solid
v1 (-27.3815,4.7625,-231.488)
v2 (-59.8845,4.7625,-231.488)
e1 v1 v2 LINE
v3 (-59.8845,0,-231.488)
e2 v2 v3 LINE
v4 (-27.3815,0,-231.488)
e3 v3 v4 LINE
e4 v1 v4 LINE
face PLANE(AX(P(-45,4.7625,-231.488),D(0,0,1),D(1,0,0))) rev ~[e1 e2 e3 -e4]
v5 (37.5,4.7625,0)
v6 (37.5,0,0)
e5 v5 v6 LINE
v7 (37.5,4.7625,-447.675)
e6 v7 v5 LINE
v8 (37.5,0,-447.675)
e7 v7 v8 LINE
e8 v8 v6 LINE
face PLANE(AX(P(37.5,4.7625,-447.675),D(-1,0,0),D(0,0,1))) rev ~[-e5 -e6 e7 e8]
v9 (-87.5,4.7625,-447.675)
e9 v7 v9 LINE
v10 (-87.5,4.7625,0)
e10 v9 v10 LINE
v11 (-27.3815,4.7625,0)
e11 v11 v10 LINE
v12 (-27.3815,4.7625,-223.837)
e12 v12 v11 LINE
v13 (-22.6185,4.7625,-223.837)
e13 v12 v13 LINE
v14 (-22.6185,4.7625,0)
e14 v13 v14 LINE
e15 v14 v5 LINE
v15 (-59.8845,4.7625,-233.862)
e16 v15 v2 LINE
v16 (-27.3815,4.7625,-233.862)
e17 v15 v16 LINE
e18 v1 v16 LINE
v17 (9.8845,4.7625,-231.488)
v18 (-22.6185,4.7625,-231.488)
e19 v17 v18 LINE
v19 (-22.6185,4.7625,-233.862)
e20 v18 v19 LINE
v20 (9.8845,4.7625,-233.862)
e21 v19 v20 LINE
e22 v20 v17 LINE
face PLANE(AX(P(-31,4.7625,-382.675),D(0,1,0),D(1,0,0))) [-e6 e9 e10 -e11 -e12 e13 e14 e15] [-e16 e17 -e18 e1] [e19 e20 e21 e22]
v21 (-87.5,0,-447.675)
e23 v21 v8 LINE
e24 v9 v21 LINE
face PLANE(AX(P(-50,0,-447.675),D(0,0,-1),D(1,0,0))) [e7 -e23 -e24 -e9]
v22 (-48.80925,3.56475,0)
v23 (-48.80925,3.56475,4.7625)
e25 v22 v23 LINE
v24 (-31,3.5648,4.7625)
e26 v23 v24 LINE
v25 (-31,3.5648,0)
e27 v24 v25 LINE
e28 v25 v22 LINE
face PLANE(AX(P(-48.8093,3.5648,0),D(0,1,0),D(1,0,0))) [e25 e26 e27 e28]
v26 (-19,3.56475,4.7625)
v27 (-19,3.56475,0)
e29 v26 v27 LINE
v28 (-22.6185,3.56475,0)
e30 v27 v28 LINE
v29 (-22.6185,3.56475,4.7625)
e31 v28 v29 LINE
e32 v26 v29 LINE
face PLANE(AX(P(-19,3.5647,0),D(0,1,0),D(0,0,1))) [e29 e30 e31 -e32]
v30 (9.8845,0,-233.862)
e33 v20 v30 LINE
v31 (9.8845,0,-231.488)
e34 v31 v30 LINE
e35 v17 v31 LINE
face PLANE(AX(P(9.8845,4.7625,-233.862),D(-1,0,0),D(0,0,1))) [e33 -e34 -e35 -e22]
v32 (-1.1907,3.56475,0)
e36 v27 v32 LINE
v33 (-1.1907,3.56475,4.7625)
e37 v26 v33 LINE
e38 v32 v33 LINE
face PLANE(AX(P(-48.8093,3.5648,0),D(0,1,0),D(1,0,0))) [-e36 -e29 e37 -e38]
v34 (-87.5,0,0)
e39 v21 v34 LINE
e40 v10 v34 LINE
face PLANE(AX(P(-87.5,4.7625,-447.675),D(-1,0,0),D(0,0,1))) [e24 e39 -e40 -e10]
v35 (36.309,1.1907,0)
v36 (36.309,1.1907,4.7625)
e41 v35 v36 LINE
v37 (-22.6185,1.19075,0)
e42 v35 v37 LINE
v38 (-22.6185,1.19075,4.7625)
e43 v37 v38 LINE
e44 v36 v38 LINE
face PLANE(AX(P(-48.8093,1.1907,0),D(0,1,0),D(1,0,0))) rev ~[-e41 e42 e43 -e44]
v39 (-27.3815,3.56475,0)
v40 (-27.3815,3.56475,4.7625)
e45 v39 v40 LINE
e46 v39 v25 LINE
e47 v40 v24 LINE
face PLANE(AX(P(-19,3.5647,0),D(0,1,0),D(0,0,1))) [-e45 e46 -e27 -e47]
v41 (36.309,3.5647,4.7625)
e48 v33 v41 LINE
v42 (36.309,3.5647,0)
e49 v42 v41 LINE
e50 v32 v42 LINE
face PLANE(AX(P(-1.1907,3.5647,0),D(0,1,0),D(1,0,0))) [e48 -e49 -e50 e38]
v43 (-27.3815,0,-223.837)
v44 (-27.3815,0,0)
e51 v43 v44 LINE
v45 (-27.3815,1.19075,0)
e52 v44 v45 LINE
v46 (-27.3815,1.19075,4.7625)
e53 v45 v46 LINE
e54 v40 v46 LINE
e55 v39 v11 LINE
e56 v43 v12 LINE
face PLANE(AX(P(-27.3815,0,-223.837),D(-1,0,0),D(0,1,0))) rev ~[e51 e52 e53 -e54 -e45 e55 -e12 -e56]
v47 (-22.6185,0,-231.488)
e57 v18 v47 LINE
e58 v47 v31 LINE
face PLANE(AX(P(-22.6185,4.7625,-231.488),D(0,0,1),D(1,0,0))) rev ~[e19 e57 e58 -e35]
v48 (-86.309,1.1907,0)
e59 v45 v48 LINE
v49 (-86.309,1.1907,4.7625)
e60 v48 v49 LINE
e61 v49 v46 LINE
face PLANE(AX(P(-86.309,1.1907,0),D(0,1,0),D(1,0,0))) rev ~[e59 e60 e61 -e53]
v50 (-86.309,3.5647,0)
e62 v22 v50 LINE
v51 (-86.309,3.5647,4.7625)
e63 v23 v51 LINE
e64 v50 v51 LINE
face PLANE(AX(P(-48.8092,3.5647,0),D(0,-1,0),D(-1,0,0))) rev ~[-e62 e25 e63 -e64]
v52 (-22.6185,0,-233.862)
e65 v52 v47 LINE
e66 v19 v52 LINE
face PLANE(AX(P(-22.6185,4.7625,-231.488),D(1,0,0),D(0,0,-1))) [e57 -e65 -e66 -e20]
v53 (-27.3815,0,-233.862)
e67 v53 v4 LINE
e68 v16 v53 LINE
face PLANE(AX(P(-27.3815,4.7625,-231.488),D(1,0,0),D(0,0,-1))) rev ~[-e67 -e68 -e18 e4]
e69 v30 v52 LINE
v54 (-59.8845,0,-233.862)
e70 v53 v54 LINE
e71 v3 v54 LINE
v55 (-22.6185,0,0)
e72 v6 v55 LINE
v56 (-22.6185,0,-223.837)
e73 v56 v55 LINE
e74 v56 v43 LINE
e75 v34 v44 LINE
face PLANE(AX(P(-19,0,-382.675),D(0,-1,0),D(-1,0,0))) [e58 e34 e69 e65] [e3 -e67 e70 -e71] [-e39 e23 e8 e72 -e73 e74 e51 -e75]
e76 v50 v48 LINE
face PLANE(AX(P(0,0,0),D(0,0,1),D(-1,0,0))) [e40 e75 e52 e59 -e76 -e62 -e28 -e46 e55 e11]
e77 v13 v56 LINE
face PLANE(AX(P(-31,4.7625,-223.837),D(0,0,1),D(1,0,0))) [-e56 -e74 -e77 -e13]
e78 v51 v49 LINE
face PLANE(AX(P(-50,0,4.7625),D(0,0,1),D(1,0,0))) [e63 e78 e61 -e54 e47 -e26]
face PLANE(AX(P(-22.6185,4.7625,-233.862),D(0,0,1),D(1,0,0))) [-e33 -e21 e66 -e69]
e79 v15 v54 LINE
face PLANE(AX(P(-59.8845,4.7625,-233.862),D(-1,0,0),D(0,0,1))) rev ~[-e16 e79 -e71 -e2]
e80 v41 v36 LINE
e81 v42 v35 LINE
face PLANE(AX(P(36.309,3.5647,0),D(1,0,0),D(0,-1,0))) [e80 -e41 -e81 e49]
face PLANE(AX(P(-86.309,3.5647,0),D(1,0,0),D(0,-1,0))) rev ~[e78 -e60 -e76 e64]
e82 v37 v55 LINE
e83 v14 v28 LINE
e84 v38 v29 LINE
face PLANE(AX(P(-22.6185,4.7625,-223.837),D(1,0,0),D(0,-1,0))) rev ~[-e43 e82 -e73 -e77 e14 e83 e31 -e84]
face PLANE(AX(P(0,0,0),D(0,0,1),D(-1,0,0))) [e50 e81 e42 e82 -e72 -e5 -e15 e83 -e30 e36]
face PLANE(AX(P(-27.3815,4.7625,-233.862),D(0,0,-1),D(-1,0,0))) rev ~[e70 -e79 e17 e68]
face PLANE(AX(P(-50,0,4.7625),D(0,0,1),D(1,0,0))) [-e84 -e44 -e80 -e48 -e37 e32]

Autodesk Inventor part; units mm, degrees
ref_plane "YZ Plane" through (0, 0, 0) normal (1, 0, 0) x (0, 1, 0)
ref_plane "XZ Plane" through (0, 0, 0) normal (0, 1, 0) x (-1, 0, 0)
ref_plane "XY Plane" through (0, 0, 0) normal (0, 0, 1) x (1, 0, 0)
sketch "Sketch1" plane through (0, 0, 0) normal (0, 1, 0) x (-1, 0, 0)
  line L0 (0, 0) -> (50, 0)
  line L1 (50, 0) -> (50, -447.675)
  line L2 (50, -447.675) -> (0, -447.675)
  line L3 (0, -447.675) -> (0, 0)
  dimension "d0" = 50
  dimension "d1" = 447.675
extrude "Extrusion1" add sketch "Sketch1" along normal blind 4.7625
sketch "Sketch2" plane through (-50, 0, 0) normal (0, 0, 1) x (1, 0, 0)
  line L0 (1.1907, 3.5648) -> (1.1907, 1.1907)
  line L1 (50, 0) -> (0, 0) projected
  line L2 (50, 4.7625) -> (0, 4.7625) projected
  line L3 (1.1907, 1.1907) -> (48.8093, 1.1907)
  line L4 (1.1907, 3.5648) -> (48.8093, 3.5648)
  line L5 (48.8093, 3.5648) -> (48.8093, 1.1907)
  line L6 (50, 0) -> (50, 4.7625) projected
extrude "Extrusion2" add sketch "Sketch2" along normal blind 4.7625
sketch "Sketch3" plane through (0, 4.7625, 0) normal (0, 1, 0) x (1, 0, 0)
  line L0 (-50, 447.675) -> (-50, 0) projected
  line L1 (-50, 447.675) -> (-25, 447.675)
  line L2 (0, 447.675) -> (-50, 447.675) projected
  line L3 (-25, 447.675) -> (-25, 382.675)
  line L4 (-31, 382.675) -> (-19, 382.675)
  line L5 (-31, 382.675) -> (-31, 0)
  line L6 (-1.1907, 0) -> (-48.8093, 0) projected
  line L7 (-19, 382.675) -> (-19, 0)
  line L8 (-31, 0) -> (-19, 0)
  point P0 (0, 0)
  dimension "d11" = 25
extrude "Extrusion3" cut sketch "Sketch3" against normal blind 10
sketch "Sketch4" plane through (-50, 0, 4.7625) normal (0, 0, 1) x (1, 0, 0)
  line L0 (31, 3.5648) -> (31, 1.1907) projected
  line L1 (31, 1.1907) -> (31, 3.5648)
  line L2 (19, 3.5648) -> (31, 3.5648) projected
  line L3 (31, 3.5648) -> (19, 3.5648)
  line L4 (19, 3.5648) -> (19, 1.1907)
  line L5 (19, 1.1907) -> (31, 1.1907)
  point P0 (50, 0)
extrude "Extrusion4" cut sketch "Sketch4" against normal blind 10
sketch "Sketch5" plane through (0, 4.7625, 0) normal (0, 1, 0) x (1, 0, 0)
  point P0 (0, 0)
sketch "Sketch6" plane through (-31, 4.7625, -382.675) normal (0, 0, 1) x (1, 0, 0)
  line L0 (12, -4.7625) -> (0, -4.7625) projected
  line L1 (12, 0) -> (12, -4.7625) projected
  line L2 (0, 0) -> (12, 0) projected
  line L3 (0, 0) -> (0, -4.7625) projected
  point P0 (31, -4.7625)
extrude "Extrusion5" add sketch "Sketch6" along normal blind 158.838
sketch "Sketch8" plane through (-31, 4.7625, -223.837) normal (0, 0, 1) x (1, 0, 0)
  line L0 (3.6185, -4.7625) -> (3.6185, 0)
  line L1 (3.6185, 0) -> (8.3815, 0)
  line L2 (8.3815, 0) -> (8.3815, -4.7625)
  line L3 (3.6185, -4.7625) -> (8.3815, -4.7625)
  line L4 (0, -4.7625) -> (12, -4.7625) projected
  line L5 (-19, 0) -> (0, 0) projected
  line L6 (0, 0) -> (3.6185, 0)
  line L7 (12, 0) -> (0, 0) projected
  line L8 (3.6185, -4.7625) -> (0, -4.7625)
  line L9 (0, -4.7625) -> (0, 0) projected
  line L10 (0, -4.7625) -> (0, 0)
  line L11 (8.3815, 0) -> (12, 0)
  line L12 (12, -3.5718) -> (12, -4.7625) projected
  line L13 (12, -4.7625) -> (8.3815, -4.7625)
  line L14 (12, -4.7625) -> (12, 0)
  point P0 (31, -4.7625)
  dimension "d25" = 4.763
extrude "Extrusion6" add sketch "Sketch8" along normal blind 223.837 contours L4 L9 L6 L0 | L2 L7 L14 L12 L4
sketch "Sketch9" plane through (-19, 1.1907, 0) normal (-1, 0, 0) x (0, 0, 1)
  line L0 (0, 2.374) -> (0, 0) projected
  line L1 (4.7625, 0) -> (0, 0) projected
  line L2 (4.7625, 2.374) -> (4.7625, 0) projected
  line L3 (0, 2.374) -> (4.7625, 2.374) projected
  point P0 (0, -1.1907)
extrude "Extrusion7" add sketch "Sketch9" along normal blind 15
sketch "Sketch10" plane through (-22.6185, 3.5648, 0) normal (0, 0, -1) x (-1, 0, 0)
  line L0 (4.763, -2.374) -> (4.763, 0) projected
  line L1 (0, 0) -> (4.763, 0) projected
  line L2 (0, 0) -> (0, -2.374) projected
  line L3 (0, -2.374) -> (4.763, -2.374) projected
  point P0 (-22.6185, -3.5648)
extrude "Extrusion8" cut sketch "Sketch10" against normal blind 15
sketch "Sketch14" plane through (0, 4.7625, 0) normal (0, 1, 0) x (1, 0, 0)
  line L0 (0, 447.675) -> (-50, 447.675) projected
  line L1 (0, 0) -> (0, 447.675) projected
  line L2 (-50, 447.675) -> (-50, 0) projected
  line L3 (-27.3815, 223.837) -> (-27.3815, 0) projected
  line L4 (-22.6185, 223.837) -> (-22.6185, 0) projected
  line L5 (-5, 231.488) -> (-22.6185, 231.488)
  line L6 (-22.6185, 231.488) -> (-22.6185, 233.862)
  line L7 (-22.6185, 233.862) -> (-5, 233.862)
  line L8 (-5, 231.488) -> (-5, 233.862)
  line L9 (-27.3815, 223.837) -> (-22.6185, 223.837) projected
  line L10 (-45, 231.488) -> (-27.3815, 231.488)
  line L11 (-27.3815, 231.488) -> (-27.3815, 233.862)
  line L12 (-27.3815, 233.862) -> (-45, 233.862)
  line L13 (-45, 231.488) -> (-45, 233.862)
  dimension "d35" = 2.374
extrude "Extrusion9" cut sketch "Sketch14" against normal blind 10
sketch "Sketch17" plane through (0, 4.7625, 0) normal (0, 1, 0) x (1, 0, 0)
  line L0 (0, 0) -> (37.5, 0)
  line L1 (0, 447.675) -> (-50, 447.675) projected
  line L2 (0, 447.675) -> (37.5, 447.675)
  line L3 (37.5, 447.675) -> (37.5, 0)
  line L4 (0, 0) -> (0, 447.675) projected
  line L5 (0, 0) -> (0, 447.675)
  line L6 (-50, 0) -> (-87.5, 0)
  line L7 (-50, 447.675) -> (-87.5, 447.675)
  line L8 (-87.5, 447.675) -> (-87.5, 0)
  line L9 (-50, 0) -> (-50, 447.675)
  dimension "d39" = 37.5
  dimension "d40" = 37.5
extrude "Extrusion10" add sketch "Sketch17" against normal up to surface (4.7625 mm away)
sketch "Sketch18" plane through (-1.1907, 1.1907, 0) normal (0, 0, 1) x (1, 0, 0)
  line L0 (37.4997, 0) -> (0, 0)
  line L1 (0, 2.374) -> (0, 0) projected
  line L2 (0, 0) -> (0, 2.374)
  line L3 (0, 2.374) -> (37.4997, 2.374)
  line L4 (37.4997, 2.374) -> (37.4997, 0)
  line L5 (38.6907, -1.1907) -> (-86.3093, -1.1907) projected
  line L6 (-21.4278, 3.5718) -> (-26.1908, 3.5718) projected
  line L7 (-85.1183, 0) -> (-47.6185, 0)
  line L8 (-47.6185, 2.374) -> (-47.6185, 0)
  line L9 (-47.6185, 2.374) -> (-85.1183, 2.374)
  line L10 (-85.1183, 2.374) -> (-85.1183, 0)
extrude "Extrusion11" add sketch "Sketch18" along normal up to surface (4.7625 mm away)
sketch "Sketch19" plane through (0, 4.7625, 0) normal (0, 1, 0) x (1, 0, 0)
  line L0 (-22.6185, 231.488) -> (9.8845, 231.488)
  line L1 (-22.6185, 233.862) -> (9.8845, 233.862)
  line L2 (9.8845, 233.862) -> (9.8845, 231.488)
  line L3 (-22.6185, 231.488) -> (-22.6185, 233.862)
  line L4 (-27.3815, 223.837) -> (-22.6185, 223.837) projected
  line L5 (-27.3815, 231.488) -> (-59.8845, 231.488)
  line L6 (-27.3815, 233.862) -> (-59.8845, 233.862)
  line L7 (-59.8845, 233.862) -> (-59.8845, 231.488)
  line L8 (-27.3815, 231.488) -> (-27.3815, 233.862)
  point P0 (0, 0)
  dimension "d47" = 32.503
extrude "Extrusion12" cut sketch "Sketch19" against normal blind 10
properties part number "Sustainable Chair_V1 - Leg" material "Foam Board - V3"
